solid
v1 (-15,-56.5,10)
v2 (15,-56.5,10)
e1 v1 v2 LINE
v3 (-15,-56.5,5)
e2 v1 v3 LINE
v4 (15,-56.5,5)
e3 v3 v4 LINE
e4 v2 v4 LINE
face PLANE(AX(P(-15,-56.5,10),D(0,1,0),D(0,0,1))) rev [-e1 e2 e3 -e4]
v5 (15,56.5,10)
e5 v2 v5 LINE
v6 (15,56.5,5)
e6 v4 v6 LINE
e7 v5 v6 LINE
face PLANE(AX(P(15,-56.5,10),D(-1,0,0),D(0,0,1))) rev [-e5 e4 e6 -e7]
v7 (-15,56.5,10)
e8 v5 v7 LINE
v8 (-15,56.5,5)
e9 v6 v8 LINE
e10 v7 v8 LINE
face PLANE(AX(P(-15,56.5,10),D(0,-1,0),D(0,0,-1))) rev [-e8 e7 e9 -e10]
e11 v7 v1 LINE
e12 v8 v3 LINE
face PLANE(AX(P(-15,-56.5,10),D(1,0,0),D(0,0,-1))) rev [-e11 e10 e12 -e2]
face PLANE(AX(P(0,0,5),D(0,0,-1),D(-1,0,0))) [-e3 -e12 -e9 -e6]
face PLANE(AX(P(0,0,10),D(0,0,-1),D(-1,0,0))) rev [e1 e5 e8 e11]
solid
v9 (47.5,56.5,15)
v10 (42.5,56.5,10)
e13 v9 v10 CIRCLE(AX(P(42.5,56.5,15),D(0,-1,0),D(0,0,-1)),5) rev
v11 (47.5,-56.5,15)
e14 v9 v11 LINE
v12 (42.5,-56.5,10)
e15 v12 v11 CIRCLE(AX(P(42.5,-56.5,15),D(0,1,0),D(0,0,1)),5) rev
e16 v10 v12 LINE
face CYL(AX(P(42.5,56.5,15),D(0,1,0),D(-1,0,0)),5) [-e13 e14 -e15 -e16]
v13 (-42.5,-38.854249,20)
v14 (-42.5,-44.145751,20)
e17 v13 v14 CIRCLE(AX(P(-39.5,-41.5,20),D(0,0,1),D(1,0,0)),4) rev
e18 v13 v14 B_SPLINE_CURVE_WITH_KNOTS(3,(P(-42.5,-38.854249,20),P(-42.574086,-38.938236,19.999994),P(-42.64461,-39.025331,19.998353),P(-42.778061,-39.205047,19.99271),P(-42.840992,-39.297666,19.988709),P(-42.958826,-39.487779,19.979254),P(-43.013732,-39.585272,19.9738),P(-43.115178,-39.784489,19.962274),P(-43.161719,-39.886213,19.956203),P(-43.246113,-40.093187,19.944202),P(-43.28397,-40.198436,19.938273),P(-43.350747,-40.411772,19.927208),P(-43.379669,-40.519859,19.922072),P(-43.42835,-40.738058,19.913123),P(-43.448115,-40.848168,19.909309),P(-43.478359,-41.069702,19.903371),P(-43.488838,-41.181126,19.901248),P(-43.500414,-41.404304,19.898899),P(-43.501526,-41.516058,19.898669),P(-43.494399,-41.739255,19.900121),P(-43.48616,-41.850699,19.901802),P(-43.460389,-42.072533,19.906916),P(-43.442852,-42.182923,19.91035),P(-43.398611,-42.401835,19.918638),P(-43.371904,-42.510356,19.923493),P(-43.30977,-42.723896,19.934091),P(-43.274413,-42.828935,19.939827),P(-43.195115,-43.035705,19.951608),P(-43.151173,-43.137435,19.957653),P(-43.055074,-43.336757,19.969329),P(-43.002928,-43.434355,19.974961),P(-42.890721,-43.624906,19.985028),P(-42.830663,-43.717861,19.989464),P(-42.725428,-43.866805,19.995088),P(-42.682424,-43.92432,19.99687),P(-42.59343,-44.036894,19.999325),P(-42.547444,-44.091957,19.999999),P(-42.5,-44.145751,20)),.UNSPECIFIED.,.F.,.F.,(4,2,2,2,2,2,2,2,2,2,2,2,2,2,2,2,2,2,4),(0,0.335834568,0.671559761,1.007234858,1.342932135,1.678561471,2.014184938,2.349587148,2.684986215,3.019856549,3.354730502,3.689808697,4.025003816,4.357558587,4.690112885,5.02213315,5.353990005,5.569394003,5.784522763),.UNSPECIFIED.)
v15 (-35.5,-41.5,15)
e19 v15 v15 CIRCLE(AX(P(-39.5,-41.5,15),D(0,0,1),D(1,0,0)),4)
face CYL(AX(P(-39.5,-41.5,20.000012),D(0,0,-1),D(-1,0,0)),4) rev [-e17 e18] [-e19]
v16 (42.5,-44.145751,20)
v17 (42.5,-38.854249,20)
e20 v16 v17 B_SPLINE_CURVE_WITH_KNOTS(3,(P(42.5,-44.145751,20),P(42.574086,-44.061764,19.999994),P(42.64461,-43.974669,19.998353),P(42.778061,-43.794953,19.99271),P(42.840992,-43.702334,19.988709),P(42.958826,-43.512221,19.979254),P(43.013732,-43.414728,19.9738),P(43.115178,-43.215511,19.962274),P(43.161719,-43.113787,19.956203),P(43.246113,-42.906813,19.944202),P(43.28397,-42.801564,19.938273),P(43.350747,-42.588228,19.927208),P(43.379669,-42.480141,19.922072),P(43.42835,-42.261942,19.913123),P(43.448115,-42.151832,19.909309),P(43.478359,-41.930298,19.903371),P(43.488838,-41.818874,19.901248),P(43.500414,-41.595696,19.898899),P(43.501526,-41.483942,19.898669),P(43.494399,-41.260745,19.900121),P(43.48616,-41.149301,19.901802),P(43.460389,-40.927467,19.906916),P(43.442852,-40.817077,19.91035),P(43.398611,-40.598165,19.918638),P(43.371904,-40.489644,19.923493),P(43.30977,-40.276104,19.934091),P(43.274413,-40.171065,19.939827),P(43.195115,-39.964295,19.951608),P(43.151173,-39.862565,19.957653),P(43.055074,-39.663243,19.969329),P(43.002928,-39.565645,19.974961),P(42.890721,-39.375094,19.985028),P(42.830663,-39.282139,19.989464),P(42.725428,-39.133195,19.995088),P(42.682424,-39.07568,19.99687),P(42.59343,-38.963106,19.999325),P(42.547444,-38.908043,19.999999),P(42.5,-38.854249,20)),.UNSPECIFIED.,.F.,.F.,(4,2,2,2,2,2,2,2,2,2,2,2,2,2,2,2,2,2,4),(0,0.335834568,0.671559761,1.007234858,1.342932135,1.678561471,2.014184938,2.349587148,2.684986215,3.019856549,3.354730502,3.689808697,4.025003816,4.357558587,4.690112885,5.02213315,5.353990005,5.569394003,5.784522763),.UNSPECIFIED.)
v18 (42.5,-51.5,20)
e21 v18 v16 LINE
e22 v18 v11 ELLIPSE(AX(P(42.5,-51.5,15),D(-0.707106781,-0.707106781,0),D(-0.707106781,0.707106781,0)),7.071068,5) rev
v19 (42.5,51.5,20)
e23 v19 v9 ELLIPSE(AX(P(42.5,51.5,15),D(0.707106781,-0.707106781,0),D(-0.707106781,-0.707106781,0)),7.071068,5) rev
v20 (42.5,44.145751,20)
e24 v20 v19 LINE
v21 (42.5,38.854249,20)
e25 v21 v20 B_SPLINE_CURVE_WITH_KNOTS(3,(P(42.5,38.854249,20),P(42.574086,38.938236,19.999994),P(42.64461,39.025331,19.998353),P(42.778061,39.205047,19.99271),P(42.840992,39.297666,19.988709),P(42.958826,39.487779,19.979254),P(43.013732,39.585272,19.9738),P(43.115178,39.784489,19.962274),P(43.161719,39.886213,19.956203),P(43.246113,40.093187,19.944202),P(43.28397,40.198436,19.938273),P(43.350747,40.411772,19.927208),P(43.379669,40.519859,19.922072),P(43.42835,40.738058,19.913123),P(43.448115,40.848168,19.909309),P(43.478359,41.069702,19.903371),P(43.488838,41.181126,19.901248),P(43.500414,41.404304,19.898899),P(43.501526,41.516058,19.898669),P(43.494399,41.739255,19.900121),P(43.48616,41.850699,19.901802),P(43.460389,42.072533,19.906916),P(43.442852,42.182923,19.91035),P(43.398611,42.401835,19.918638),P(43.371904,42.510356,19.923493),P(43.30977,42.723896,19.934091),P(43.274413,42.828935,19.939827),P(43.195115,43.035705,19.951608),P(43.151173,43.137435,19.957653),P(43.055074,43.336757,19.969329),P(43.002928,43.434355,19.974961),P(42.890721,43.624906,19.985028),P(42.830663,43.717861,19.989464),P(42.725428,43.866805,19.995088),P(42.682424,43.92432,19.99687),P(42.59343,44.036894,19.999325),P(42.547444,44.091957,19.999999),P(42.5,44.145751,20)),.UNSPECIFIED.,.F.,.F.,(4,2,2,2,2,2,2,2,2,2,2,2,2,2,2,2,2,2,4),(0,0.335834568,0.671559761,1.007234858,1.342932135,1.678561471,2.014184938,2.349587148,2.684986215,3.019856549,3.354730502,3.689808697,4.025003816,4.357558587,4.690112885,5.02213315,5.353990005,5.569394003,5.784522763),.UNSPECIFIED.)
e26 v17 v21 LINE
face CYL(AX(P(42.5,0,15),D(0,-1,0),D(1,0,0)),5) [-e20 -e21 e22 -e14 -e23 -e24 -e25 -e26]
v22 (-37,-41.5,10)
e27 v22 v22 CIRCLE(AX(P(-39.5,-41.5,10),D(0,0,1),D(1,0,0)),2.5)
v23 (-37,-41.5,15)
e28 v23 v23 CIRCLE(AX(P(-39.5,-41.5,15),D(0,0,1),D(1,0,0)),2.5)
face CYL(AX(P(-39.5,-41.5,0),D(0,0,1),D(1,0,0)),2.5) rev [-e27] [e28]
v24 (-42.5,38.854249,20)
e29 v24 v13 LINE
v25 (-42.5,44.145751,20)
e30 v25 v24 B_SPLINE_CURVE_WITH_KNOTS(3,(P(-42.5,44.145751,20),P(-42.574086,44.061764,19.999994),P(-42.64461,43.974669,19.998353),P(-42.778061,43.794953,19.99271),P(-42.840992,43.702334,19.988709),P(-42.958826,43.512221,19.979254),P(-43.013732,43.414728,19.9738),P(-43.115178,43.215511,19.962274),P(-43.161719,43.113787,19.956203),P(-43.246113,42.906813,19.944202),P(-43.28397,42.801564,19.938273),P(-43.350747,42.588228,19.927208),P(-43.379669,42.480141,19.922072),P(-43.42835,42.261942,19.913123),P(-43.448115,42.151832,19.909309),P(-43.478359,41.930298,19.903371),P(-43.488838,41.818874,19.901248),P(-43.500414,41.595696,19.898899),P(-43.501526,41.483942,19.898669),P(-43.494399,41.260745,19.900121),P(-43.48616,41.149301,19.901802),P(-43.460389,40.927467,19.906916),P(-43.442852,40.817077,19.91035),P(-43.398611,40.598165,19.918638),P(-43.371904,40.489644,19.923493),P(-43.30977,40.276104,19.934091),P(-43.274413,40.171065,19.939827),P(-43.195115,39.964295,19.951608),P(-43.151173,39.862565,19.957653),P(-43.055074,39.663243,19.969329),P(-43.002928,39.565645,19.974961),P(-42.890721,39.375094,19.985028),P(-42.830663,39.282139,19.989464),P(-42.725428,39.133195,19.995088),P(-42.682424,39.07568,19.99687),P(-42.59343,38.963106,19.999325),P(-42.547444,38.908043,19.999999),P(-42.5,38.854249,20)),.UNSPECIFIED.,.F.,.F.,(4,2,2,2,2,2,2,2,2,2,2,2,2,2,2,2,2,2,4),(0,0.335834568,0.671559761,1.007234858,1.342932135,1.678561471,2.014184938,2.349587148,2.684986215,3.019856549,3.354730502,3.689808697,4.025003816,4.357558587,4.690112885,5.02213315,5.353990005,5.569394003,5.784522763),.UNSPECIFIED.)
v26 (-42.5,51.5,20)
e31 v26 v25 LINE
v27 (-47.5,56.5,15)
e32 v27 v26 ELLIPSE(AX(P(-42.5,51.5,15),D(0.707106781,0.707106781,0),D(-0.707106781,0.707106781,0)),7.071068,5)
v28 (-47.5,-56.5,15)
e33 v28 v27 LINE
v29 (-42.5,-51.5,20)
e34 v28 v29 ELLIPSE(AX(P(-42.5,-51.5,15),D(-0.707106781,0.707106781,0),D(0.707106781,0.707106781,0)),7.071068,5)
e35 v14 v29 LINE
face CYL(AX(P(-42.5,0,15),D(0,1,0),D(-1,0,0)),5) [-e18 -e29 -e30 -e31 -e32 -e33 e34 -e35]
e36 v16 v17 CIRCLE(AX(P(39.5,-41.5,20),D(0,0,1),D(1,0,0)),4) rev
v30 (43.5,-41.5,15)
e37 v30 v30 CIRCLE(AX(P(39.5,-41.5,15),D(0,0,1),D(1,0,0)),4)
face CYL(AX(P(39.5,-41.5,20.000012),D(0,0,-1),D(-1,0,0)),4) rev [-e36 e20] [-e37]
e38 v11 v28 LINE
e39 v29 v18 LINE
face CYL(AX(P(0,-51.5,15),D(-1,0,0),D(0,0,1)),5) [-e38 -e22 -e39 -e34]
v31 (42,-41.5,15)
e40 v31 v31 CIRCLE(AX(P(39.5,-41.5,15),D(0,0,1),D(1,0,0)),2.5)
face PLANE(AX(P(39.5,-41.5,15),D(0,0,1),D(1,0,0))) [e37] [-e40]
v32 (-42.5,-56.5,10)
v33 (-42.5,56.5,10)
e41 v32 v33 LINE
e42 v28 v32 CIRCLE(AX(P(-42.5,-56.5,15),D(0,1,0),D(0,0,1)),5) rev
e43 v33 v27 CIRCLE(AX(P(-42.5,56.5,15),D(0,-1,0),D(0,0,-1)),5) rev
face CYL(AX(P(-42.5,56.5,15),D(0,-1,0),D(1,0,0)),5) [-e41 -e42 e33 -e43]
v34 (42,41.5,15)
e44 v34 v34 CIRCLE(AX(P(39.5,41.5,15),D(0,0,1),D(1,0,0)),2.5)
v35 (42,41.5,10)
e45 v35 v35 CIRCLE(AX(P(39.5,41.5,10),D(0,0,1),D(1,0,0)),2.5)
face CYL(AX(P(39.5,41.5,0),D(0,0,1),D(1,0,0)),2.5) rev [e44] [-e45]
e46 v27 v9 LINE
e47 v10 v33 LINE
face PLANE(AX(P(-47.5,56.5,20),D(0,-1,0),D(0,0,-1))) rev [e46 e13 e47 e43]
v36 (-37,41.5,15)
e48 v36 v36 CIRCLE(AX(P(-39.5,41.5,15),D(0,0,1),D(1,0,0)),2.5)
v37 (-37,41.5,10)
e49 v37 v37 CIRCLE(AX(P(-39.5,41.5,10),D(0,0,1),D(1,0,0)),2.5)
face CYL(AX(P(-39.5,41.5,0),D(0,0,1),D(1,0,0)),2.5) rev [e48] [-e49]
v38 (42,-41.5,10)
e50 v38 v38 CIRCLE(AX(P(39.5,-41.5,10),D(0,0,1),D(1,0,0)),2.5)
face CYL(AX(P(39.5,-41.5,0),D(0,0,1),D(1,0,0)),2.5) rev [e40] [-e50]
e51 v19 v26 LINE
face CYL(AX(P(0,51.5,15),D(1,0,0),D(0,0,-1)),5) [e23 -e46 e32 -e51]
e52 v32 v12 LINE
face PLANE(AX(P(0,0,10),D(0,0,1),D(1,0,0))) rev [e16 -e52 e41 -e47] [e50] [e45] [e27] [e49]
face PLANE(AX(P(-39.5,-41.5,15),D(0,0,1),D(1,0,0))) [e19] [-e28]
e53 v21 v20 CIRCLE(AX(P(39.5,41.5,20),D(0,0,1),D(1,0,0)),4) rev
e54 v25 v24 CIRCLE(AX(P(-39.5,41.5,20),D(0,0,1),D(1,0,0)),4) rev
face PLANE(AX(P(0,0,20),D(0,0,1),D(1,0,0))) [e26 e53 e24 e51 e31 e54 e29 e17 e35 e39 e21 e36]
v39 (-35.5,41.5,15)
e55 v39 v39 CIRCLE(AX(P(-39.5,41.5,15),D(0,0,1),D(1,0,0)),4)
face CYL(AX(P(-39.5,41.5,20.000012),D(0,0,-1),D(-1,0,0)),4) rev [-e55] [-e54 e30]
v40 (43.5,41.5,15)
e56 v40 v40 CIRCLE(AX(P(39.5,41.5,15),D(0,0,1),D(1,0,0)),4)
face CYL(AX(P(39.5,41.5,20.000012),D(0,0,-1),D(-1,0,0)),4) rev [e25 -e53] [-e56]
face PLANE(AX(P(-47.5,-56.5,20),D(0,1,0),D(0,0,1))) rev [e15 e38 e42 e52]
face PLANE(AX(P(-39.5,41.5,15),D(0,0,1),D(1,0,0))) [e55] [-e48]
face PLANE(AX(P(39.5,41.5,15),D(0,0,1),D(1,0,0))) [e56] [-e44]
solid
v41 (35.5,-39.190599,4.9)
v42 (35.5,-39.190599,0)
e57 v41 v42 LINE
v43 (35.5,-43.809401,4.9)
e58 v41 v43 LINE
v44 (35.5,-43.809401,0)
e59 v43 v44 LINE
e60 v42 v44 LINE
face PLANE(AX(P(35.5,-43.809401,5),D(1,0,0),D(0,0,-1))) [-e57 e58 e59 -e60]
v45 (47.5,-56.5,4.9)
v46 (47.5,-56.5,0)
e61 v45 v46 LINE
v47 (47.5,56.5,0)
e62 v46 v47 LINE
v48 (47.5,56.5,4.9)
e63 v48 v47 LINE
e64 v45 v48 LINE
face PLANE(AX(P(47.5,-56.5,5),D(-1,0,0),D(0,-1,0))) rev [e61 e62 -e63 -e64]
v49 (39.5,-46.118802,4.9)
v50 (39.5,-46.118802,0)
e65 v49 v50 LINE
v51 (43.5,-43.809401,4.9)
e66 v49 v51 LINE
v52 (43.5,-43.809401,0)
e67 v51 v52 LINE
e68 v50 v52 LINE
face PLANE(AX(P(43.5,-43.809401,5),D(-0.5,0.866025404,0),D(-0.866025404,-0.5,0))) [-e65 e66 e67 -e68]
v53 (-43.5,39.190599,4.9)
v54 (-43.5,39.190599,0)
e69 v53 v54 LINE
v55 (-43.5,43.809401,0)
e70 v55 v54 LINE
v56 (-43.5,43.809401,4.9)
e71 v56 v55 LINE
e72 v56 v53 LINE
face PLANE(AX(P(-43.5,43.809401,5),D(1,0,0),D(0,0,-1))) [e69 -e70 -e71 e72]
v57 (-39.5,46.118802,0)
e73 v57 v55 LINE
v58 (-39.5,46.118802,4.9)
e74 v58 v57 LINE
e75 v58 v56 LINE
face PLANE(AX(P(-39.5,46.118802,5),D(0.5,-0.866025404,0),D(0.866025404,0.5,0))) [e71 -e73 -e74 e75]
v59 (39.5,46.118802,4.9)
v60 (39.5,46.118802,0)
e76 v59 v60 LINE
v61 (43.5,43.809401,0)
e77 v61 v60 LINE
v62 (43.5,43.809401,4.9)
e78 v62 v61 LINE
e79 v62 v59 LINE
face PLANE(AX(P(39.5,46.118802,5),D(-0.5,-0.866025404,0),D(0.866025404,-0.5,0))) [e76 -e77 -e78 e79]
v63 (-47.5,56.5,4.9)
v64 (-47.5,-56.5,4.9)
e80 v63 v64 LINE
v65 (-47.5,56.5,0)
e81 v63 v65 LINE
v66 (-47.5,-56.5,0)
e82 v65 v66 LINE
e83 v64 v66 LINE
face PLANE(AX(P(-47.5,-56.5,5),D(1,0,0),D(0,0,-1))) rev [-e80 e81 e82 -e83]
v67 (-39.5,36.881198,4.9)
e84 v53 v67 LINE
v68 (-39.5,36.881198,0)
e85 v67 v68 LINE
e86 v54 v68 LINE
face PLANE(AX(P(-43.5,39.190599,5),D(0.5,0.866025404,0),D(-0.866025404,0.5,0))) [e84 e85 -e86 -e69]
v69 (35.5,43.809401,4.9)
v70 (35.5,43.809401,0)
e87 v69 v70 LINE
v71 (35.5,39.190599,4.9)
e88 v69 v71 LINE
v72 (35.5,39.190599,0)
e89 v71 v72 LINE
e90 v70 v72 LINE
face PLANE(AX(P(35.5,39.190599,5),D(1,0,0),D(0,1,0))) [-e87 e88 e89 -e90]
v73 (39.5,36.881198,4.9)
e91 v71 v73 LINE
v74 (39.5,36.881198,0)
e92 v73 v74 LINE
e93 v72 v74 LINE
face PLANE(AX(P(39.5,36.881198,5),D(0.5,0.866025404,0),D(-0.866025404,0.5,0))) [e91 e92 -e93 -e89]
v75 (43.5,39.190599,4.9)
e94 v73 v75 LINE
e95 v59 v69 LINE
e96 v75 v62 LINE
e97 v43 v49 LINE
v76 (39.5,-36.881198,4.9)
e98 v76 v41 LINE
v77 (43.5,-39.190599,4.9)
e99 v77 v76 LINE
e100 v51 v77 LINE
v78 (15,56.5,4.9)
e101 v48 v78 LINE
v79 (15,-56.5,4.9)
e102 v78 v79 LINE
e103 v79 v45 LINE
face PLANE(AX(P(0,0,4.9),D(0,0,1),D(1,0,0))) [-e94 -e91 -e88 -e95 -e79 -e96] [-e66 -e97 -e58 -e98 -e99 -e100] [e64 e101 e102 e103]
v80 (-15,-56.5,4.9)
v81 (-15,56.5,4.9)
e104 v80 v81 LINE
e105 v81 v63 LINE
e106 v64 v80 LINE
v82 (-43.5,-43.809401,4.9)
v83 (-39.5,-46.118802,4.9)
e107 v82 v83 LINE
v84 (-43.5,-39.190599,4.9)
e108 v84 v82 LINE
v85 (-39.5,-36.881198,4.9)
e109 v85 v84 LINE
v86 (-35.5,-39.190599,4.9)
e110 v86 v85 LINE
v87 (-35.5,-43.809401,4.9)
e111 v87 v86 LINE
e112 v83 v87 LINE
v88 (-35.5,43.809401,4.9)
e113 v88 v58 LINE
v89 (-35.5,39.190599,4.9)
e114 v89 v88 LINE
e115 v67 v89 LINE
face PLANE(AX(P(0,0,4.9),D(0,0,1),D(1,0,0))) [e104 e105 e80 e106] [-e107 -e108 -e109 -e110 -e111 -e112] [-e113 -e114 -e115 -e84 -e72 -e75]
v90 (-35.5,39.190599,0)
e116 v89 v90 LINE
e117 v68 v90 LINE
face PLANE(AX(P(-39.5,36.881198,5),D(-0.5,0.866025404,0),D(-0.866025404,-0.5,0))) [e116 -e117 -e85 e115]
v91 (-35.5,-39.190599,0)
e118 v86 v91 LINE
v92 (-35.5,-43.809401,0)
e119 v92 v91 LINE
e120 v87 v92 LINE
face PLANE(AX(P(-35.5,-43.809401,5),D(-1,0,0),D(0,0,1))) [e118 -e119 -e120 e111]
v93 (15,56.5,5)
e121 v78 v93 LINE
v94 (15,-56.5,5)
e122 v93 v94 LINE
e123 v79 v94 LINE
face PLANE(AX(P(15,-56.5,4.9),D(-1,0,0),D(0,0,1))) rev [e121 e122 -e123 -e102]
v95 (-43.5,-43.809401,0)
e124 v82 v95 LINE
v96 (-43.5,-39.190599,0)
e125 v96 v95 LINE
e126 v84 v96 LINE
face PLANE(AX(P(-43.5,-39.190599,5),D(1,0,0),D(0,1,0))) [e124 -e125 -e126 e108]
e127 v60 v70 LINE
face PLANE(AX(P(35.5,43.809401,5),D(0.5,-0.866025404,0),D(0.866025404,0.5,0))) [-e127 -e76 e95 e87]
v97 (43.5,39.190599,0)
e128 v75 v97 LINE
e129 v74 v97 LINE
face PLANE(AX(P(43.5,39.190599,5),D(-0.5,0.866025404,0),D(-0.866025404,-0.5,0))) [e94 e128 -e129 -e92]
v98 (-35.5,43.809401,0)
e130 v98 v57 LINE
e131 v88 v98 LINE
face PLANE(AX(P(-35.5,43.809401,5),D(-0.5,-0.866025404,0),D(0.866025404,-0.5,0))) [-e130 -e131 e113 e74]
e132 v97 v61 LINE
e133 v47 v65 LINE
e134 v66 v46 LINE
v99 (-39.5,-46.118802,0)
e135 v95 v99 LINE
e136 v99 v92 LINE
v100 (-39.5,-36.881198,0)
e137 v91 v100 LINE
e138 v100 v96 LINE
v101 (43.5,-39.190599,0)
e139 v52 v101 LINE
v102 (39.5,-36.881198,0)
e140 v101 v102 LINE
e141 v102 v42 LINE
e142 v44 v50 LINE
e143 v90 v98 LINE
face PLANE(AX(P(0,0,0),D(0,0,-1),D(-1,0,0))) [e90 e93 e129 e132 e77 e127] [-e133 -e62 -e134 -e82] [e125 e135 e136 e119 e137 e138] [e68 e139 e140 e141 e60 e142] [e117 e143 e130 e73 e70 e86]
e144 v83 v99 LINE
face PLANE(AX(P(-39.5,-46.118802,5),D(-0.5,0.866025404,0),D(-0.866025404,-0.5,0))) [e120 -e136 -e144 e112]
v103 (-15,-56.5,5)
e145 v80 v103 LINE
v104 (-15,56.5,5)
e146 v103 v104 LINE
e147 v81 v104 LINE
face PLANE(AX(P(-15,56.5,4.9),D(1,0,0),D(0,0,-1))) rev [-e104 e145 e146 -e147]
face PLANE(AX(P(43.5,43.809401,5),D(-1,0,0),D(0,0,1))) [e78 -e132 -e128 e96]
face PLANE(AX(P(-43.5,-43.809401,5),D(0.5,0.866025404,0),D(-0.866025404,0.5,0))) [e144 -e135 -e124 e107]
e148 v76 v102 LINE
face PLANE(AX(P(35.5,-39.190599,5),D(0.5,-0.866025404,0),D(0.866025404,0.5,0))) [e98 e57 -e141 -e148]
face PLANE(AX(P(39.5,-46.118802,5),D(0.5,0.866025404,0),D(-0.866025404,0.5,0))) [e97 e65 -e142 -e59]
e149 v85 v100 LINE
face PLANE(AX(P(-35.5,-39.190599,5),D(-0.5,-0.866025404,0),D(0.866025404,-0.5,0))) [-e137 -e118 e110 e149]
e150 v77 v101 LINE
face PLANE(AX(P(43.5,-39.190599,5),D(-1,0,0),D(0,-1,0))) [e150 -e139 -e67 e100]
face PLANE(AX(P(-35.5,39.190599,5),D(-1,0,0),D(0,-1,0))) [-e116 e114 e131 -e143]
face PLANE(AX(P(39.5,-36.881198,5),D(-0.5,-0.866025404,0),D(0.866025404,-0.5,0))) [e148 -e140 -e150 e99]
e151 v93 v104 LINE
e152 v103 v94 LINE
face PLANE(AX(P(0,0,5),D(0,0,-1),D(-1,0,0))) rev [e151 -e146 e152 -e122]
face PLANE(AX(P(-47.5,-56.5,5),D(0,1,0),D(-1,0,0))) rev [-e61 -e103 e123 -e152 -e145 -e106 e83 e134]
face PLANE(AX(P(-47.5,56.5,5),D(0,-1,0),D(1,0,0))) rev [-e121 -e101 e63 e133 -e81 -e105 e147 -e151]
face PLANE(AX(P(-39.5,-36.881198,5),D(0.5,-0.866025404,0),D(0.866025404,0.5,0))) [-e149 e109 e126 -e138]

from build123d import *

# Parameters (mm, degrees)
CROQUIS1_W                 = 95
CROQUIS1_H                 = 113
SALIENTE_EXTRUIR1_DEPTH    = 5
CROQUIS2_W                 = 30
CROQUIS2_H                 = 113
SALIENTE_EXTRUIR2_DEPTH    = 5
CROQUIS3_W                 = 95
CROQUIS3_H                 = 113
SALIENTE_EXTRUIR3_DEPTH    = 10
CORTAR_EXTRUIR3_DEPTH      = 77.475486268
CORTAR_EXTRUIR3_DEPTH_BACK = 5
CROQUIS4_R                 = 4
CROQUIS5_R                 = 2.5
CORTAR_EXTRUIR7_DEPTH      = 77.475486268
REDONDEO3_R                = 5
REDONDEO2_R                = 5
CROQUIS6_W                 = 32.5
CROQUIS6_H                 = 113
CORTAR_EXTRUIR8_DEPTH      = 0.1


# Some blends are built 0.0001 mm under size
with BuildPart() as part:
    # Croquis1 → Saliente-Extruir1 (new body)
    with BuildSketch(Plane.XY):
        Rectangle(CROQUIS1_W, CROQUIS1_H)
        Polygon((-35.5, 39.190598923), (-35.5, 43.809401077), (-39.5, 46.118802154), (-43.5, 43.809401077), (-43.5, 39.190598923), (-39.5, 36.881197846), align=None, mode=Mode.SUBTRACT)
        Polygon((-35.5, -43.809401077), (-35.5, -39.190598923), (-39.5, -36.881197846), (-43.5, -39.190598923), (-43.5, -43.809401077), (-39.5, -46.118802154), align=None, mode=Mode.SUBTRACT)
        Polygon((39.5, -46.118802154), (35.5, -43.809401077), (35.5, -39.190598923), (39.5, -36.881197846), (43.5, -39.190598923), (43.5, -43.809401077), align=None, mode=Mode.SUBTRACT)
        Polygon((39.5, 36.881197846), (35.5, 39.190598923), (35.5, 43.809401077), (39.5, 46.118802154), (43.5, 43.809401077), (43.5, 39.190598923), align=None, mode=Mode.SUBTRACT)
    extrude(amount=SALIENTE_EXTRUIR1_DEPTH)

    # Croquis6 → Cortar-Extruir8 (cut)
    with BuildSketch(Plane.XY.offset(5)):
        with Locations((-31.25, 0)):
            Rectangle(CROQUIS6_W, CROQUIS6_H)
        with Locations((31.25, 0)):
            Rectangle(CROQUIS6_W, CROQUIS6_H)
    extrude(amount=-CORTAR_EXTRUIR8_DEPTH, mode=Mode.SUBTRACT)


with BuildPart() as body_2:
    # Croquis2 → Saliente-Extruir2 (new body)
    with BuildSketch(Plane.XY.offset(5)):
        Rectangle(CROQUIS2_W, CROQUIS2_H)
    extrude(amount=SALIENTE_EXTRUIR2_DEPTH)


with BuildPart() as body_3:
    # Croquis3 → Saliente-Extruir3 (new body)
    with BuildSketch(Plane.XY.offset(10)):
        Rectangle(CROQUIS3_W, CROQUIS3_H)
    extrude(amount=SALIENTE_EXTRUIR3_DEPTH)

    # Croquis4 → Cortar-Extruir3 (cut, two sides: drawn at the far end of the back side and taken through both)
    with BuildSketch(Plane.XY.offset(20).offset(-CORTAR_EXTRUIR3_DEPTH_BACK)):
        with Locations(Location((39.5, 41.5, 0), (0, 0, 180))):
            Circle(CROQUIS4_R)
        with Locations(Location((-39.5, 41.5, 0), (0, 0, 180))):
            Circle(CROQUIS4_R)
        with Locations(Location((-39.5, -41.5, 0), (0, 0, 180))):
            Circle(CROQUIS4_R)
        with Locations(Location((39.5, -41.5, 0), (0, 0, 180))):
            Circle(CROQUIS4_R)
    extrude(amount=CORTAR_EXTRUIR3_DEPTH + CORTAR_EXTRUIR3_DEPTH_BACK, mode=Mode.SUBTRACT)

    # Croquis5 → Cortar-Extruir7 (cut, through all)
    with BuildSketch(Plane.XY.offset(20)):
        with Locations((-39.5, 41.5)):
            Circle(CROQUIS5_R)
        with Locations((39.5, 41.5)):
            Circle(CROQUIS5_R)
        with Locations((-39.5, -41.5)):
            Circle(CROQUIS5_R)
        with Locations((39.5, -41.5)):
            Circle(CROQUIS5_R)
    extrude(amount=-CORTAR_EXTRUIR7_DEPTH, mode=Mode.SUBTRACT)

    # Redondeo3
    # the kernel refuses this fillet: 5 mm, written as the material it takes off along each edge
    with BuildSketch(Plane(origin=(47.5, 69, 20), x_dir=(0, 0, -1), z_dir=(0, -1, 0)), Plane(origin=(-47.5, -69, 20), x_dir=(0, 0, -1), z_dir=(0, 1, 0))) as redondeo3_piece_1:
        with BuildLine():
            CenterArc((REDONDEO3_R, -REDONDEO3_R), REDONDEO3_R, 90, 90)
            Line((0, -REDONDEO3_R), (0, 0))
            Line((0, 0), (REDONDEO3_R, 0))
        make_face()
    extrude(amount=138, mode=Mode.SUBTRACT)
    with BuildSketch(Plane(origin=(-60, 56.5, 20), x_dir=(0, 0, -1), z_dir=(1, 0, 0))) as redondeo3_piece_2:
        with BuildLine():
            CenterArc((REDONDEO3_R, -REDONDEO3_R), REDONDEO3_R, 90, 90)
            Line((0, -REDONDEO3_R), (0, 0))
            Line((0, 0), (REDONDEO3_R, 0))
        make_face()
    extrude(amount=120, mode=Mode.SUBTRACT)
    with BuildSketch(Plane(origin=(60, -56.5, 20), x_dir=(0, 1, 0), z_dir=(-1, 0, 0))) as redondeo3_piece_3:
        with BuildLine():
            CenterArc((REDONDEO3_R, REDONDEO3_R), REDONDEO3_R, 180, 90)
            Line((0, REDONDEO3_R), (0, 0))
            Line((0, 0), (REDONDEO3_R, 0))
        make_face()
    extrude(amount=120, mode=Mode.SUBTRACT)

    # Redondeo2
    redondeo2_edges = [body_3.edges().sort_by_distance(p)[0] for p in [
        (47.5, 0, 10),
        (-47.5, 0, 10),
    ]]
    fillet(redondeo2_edges, radius=REDONDEO2_R - 0.0001)  # a hair under: the kernel refuses the full size


solid = Compound([part.part, body_2.part, body_3.part])
